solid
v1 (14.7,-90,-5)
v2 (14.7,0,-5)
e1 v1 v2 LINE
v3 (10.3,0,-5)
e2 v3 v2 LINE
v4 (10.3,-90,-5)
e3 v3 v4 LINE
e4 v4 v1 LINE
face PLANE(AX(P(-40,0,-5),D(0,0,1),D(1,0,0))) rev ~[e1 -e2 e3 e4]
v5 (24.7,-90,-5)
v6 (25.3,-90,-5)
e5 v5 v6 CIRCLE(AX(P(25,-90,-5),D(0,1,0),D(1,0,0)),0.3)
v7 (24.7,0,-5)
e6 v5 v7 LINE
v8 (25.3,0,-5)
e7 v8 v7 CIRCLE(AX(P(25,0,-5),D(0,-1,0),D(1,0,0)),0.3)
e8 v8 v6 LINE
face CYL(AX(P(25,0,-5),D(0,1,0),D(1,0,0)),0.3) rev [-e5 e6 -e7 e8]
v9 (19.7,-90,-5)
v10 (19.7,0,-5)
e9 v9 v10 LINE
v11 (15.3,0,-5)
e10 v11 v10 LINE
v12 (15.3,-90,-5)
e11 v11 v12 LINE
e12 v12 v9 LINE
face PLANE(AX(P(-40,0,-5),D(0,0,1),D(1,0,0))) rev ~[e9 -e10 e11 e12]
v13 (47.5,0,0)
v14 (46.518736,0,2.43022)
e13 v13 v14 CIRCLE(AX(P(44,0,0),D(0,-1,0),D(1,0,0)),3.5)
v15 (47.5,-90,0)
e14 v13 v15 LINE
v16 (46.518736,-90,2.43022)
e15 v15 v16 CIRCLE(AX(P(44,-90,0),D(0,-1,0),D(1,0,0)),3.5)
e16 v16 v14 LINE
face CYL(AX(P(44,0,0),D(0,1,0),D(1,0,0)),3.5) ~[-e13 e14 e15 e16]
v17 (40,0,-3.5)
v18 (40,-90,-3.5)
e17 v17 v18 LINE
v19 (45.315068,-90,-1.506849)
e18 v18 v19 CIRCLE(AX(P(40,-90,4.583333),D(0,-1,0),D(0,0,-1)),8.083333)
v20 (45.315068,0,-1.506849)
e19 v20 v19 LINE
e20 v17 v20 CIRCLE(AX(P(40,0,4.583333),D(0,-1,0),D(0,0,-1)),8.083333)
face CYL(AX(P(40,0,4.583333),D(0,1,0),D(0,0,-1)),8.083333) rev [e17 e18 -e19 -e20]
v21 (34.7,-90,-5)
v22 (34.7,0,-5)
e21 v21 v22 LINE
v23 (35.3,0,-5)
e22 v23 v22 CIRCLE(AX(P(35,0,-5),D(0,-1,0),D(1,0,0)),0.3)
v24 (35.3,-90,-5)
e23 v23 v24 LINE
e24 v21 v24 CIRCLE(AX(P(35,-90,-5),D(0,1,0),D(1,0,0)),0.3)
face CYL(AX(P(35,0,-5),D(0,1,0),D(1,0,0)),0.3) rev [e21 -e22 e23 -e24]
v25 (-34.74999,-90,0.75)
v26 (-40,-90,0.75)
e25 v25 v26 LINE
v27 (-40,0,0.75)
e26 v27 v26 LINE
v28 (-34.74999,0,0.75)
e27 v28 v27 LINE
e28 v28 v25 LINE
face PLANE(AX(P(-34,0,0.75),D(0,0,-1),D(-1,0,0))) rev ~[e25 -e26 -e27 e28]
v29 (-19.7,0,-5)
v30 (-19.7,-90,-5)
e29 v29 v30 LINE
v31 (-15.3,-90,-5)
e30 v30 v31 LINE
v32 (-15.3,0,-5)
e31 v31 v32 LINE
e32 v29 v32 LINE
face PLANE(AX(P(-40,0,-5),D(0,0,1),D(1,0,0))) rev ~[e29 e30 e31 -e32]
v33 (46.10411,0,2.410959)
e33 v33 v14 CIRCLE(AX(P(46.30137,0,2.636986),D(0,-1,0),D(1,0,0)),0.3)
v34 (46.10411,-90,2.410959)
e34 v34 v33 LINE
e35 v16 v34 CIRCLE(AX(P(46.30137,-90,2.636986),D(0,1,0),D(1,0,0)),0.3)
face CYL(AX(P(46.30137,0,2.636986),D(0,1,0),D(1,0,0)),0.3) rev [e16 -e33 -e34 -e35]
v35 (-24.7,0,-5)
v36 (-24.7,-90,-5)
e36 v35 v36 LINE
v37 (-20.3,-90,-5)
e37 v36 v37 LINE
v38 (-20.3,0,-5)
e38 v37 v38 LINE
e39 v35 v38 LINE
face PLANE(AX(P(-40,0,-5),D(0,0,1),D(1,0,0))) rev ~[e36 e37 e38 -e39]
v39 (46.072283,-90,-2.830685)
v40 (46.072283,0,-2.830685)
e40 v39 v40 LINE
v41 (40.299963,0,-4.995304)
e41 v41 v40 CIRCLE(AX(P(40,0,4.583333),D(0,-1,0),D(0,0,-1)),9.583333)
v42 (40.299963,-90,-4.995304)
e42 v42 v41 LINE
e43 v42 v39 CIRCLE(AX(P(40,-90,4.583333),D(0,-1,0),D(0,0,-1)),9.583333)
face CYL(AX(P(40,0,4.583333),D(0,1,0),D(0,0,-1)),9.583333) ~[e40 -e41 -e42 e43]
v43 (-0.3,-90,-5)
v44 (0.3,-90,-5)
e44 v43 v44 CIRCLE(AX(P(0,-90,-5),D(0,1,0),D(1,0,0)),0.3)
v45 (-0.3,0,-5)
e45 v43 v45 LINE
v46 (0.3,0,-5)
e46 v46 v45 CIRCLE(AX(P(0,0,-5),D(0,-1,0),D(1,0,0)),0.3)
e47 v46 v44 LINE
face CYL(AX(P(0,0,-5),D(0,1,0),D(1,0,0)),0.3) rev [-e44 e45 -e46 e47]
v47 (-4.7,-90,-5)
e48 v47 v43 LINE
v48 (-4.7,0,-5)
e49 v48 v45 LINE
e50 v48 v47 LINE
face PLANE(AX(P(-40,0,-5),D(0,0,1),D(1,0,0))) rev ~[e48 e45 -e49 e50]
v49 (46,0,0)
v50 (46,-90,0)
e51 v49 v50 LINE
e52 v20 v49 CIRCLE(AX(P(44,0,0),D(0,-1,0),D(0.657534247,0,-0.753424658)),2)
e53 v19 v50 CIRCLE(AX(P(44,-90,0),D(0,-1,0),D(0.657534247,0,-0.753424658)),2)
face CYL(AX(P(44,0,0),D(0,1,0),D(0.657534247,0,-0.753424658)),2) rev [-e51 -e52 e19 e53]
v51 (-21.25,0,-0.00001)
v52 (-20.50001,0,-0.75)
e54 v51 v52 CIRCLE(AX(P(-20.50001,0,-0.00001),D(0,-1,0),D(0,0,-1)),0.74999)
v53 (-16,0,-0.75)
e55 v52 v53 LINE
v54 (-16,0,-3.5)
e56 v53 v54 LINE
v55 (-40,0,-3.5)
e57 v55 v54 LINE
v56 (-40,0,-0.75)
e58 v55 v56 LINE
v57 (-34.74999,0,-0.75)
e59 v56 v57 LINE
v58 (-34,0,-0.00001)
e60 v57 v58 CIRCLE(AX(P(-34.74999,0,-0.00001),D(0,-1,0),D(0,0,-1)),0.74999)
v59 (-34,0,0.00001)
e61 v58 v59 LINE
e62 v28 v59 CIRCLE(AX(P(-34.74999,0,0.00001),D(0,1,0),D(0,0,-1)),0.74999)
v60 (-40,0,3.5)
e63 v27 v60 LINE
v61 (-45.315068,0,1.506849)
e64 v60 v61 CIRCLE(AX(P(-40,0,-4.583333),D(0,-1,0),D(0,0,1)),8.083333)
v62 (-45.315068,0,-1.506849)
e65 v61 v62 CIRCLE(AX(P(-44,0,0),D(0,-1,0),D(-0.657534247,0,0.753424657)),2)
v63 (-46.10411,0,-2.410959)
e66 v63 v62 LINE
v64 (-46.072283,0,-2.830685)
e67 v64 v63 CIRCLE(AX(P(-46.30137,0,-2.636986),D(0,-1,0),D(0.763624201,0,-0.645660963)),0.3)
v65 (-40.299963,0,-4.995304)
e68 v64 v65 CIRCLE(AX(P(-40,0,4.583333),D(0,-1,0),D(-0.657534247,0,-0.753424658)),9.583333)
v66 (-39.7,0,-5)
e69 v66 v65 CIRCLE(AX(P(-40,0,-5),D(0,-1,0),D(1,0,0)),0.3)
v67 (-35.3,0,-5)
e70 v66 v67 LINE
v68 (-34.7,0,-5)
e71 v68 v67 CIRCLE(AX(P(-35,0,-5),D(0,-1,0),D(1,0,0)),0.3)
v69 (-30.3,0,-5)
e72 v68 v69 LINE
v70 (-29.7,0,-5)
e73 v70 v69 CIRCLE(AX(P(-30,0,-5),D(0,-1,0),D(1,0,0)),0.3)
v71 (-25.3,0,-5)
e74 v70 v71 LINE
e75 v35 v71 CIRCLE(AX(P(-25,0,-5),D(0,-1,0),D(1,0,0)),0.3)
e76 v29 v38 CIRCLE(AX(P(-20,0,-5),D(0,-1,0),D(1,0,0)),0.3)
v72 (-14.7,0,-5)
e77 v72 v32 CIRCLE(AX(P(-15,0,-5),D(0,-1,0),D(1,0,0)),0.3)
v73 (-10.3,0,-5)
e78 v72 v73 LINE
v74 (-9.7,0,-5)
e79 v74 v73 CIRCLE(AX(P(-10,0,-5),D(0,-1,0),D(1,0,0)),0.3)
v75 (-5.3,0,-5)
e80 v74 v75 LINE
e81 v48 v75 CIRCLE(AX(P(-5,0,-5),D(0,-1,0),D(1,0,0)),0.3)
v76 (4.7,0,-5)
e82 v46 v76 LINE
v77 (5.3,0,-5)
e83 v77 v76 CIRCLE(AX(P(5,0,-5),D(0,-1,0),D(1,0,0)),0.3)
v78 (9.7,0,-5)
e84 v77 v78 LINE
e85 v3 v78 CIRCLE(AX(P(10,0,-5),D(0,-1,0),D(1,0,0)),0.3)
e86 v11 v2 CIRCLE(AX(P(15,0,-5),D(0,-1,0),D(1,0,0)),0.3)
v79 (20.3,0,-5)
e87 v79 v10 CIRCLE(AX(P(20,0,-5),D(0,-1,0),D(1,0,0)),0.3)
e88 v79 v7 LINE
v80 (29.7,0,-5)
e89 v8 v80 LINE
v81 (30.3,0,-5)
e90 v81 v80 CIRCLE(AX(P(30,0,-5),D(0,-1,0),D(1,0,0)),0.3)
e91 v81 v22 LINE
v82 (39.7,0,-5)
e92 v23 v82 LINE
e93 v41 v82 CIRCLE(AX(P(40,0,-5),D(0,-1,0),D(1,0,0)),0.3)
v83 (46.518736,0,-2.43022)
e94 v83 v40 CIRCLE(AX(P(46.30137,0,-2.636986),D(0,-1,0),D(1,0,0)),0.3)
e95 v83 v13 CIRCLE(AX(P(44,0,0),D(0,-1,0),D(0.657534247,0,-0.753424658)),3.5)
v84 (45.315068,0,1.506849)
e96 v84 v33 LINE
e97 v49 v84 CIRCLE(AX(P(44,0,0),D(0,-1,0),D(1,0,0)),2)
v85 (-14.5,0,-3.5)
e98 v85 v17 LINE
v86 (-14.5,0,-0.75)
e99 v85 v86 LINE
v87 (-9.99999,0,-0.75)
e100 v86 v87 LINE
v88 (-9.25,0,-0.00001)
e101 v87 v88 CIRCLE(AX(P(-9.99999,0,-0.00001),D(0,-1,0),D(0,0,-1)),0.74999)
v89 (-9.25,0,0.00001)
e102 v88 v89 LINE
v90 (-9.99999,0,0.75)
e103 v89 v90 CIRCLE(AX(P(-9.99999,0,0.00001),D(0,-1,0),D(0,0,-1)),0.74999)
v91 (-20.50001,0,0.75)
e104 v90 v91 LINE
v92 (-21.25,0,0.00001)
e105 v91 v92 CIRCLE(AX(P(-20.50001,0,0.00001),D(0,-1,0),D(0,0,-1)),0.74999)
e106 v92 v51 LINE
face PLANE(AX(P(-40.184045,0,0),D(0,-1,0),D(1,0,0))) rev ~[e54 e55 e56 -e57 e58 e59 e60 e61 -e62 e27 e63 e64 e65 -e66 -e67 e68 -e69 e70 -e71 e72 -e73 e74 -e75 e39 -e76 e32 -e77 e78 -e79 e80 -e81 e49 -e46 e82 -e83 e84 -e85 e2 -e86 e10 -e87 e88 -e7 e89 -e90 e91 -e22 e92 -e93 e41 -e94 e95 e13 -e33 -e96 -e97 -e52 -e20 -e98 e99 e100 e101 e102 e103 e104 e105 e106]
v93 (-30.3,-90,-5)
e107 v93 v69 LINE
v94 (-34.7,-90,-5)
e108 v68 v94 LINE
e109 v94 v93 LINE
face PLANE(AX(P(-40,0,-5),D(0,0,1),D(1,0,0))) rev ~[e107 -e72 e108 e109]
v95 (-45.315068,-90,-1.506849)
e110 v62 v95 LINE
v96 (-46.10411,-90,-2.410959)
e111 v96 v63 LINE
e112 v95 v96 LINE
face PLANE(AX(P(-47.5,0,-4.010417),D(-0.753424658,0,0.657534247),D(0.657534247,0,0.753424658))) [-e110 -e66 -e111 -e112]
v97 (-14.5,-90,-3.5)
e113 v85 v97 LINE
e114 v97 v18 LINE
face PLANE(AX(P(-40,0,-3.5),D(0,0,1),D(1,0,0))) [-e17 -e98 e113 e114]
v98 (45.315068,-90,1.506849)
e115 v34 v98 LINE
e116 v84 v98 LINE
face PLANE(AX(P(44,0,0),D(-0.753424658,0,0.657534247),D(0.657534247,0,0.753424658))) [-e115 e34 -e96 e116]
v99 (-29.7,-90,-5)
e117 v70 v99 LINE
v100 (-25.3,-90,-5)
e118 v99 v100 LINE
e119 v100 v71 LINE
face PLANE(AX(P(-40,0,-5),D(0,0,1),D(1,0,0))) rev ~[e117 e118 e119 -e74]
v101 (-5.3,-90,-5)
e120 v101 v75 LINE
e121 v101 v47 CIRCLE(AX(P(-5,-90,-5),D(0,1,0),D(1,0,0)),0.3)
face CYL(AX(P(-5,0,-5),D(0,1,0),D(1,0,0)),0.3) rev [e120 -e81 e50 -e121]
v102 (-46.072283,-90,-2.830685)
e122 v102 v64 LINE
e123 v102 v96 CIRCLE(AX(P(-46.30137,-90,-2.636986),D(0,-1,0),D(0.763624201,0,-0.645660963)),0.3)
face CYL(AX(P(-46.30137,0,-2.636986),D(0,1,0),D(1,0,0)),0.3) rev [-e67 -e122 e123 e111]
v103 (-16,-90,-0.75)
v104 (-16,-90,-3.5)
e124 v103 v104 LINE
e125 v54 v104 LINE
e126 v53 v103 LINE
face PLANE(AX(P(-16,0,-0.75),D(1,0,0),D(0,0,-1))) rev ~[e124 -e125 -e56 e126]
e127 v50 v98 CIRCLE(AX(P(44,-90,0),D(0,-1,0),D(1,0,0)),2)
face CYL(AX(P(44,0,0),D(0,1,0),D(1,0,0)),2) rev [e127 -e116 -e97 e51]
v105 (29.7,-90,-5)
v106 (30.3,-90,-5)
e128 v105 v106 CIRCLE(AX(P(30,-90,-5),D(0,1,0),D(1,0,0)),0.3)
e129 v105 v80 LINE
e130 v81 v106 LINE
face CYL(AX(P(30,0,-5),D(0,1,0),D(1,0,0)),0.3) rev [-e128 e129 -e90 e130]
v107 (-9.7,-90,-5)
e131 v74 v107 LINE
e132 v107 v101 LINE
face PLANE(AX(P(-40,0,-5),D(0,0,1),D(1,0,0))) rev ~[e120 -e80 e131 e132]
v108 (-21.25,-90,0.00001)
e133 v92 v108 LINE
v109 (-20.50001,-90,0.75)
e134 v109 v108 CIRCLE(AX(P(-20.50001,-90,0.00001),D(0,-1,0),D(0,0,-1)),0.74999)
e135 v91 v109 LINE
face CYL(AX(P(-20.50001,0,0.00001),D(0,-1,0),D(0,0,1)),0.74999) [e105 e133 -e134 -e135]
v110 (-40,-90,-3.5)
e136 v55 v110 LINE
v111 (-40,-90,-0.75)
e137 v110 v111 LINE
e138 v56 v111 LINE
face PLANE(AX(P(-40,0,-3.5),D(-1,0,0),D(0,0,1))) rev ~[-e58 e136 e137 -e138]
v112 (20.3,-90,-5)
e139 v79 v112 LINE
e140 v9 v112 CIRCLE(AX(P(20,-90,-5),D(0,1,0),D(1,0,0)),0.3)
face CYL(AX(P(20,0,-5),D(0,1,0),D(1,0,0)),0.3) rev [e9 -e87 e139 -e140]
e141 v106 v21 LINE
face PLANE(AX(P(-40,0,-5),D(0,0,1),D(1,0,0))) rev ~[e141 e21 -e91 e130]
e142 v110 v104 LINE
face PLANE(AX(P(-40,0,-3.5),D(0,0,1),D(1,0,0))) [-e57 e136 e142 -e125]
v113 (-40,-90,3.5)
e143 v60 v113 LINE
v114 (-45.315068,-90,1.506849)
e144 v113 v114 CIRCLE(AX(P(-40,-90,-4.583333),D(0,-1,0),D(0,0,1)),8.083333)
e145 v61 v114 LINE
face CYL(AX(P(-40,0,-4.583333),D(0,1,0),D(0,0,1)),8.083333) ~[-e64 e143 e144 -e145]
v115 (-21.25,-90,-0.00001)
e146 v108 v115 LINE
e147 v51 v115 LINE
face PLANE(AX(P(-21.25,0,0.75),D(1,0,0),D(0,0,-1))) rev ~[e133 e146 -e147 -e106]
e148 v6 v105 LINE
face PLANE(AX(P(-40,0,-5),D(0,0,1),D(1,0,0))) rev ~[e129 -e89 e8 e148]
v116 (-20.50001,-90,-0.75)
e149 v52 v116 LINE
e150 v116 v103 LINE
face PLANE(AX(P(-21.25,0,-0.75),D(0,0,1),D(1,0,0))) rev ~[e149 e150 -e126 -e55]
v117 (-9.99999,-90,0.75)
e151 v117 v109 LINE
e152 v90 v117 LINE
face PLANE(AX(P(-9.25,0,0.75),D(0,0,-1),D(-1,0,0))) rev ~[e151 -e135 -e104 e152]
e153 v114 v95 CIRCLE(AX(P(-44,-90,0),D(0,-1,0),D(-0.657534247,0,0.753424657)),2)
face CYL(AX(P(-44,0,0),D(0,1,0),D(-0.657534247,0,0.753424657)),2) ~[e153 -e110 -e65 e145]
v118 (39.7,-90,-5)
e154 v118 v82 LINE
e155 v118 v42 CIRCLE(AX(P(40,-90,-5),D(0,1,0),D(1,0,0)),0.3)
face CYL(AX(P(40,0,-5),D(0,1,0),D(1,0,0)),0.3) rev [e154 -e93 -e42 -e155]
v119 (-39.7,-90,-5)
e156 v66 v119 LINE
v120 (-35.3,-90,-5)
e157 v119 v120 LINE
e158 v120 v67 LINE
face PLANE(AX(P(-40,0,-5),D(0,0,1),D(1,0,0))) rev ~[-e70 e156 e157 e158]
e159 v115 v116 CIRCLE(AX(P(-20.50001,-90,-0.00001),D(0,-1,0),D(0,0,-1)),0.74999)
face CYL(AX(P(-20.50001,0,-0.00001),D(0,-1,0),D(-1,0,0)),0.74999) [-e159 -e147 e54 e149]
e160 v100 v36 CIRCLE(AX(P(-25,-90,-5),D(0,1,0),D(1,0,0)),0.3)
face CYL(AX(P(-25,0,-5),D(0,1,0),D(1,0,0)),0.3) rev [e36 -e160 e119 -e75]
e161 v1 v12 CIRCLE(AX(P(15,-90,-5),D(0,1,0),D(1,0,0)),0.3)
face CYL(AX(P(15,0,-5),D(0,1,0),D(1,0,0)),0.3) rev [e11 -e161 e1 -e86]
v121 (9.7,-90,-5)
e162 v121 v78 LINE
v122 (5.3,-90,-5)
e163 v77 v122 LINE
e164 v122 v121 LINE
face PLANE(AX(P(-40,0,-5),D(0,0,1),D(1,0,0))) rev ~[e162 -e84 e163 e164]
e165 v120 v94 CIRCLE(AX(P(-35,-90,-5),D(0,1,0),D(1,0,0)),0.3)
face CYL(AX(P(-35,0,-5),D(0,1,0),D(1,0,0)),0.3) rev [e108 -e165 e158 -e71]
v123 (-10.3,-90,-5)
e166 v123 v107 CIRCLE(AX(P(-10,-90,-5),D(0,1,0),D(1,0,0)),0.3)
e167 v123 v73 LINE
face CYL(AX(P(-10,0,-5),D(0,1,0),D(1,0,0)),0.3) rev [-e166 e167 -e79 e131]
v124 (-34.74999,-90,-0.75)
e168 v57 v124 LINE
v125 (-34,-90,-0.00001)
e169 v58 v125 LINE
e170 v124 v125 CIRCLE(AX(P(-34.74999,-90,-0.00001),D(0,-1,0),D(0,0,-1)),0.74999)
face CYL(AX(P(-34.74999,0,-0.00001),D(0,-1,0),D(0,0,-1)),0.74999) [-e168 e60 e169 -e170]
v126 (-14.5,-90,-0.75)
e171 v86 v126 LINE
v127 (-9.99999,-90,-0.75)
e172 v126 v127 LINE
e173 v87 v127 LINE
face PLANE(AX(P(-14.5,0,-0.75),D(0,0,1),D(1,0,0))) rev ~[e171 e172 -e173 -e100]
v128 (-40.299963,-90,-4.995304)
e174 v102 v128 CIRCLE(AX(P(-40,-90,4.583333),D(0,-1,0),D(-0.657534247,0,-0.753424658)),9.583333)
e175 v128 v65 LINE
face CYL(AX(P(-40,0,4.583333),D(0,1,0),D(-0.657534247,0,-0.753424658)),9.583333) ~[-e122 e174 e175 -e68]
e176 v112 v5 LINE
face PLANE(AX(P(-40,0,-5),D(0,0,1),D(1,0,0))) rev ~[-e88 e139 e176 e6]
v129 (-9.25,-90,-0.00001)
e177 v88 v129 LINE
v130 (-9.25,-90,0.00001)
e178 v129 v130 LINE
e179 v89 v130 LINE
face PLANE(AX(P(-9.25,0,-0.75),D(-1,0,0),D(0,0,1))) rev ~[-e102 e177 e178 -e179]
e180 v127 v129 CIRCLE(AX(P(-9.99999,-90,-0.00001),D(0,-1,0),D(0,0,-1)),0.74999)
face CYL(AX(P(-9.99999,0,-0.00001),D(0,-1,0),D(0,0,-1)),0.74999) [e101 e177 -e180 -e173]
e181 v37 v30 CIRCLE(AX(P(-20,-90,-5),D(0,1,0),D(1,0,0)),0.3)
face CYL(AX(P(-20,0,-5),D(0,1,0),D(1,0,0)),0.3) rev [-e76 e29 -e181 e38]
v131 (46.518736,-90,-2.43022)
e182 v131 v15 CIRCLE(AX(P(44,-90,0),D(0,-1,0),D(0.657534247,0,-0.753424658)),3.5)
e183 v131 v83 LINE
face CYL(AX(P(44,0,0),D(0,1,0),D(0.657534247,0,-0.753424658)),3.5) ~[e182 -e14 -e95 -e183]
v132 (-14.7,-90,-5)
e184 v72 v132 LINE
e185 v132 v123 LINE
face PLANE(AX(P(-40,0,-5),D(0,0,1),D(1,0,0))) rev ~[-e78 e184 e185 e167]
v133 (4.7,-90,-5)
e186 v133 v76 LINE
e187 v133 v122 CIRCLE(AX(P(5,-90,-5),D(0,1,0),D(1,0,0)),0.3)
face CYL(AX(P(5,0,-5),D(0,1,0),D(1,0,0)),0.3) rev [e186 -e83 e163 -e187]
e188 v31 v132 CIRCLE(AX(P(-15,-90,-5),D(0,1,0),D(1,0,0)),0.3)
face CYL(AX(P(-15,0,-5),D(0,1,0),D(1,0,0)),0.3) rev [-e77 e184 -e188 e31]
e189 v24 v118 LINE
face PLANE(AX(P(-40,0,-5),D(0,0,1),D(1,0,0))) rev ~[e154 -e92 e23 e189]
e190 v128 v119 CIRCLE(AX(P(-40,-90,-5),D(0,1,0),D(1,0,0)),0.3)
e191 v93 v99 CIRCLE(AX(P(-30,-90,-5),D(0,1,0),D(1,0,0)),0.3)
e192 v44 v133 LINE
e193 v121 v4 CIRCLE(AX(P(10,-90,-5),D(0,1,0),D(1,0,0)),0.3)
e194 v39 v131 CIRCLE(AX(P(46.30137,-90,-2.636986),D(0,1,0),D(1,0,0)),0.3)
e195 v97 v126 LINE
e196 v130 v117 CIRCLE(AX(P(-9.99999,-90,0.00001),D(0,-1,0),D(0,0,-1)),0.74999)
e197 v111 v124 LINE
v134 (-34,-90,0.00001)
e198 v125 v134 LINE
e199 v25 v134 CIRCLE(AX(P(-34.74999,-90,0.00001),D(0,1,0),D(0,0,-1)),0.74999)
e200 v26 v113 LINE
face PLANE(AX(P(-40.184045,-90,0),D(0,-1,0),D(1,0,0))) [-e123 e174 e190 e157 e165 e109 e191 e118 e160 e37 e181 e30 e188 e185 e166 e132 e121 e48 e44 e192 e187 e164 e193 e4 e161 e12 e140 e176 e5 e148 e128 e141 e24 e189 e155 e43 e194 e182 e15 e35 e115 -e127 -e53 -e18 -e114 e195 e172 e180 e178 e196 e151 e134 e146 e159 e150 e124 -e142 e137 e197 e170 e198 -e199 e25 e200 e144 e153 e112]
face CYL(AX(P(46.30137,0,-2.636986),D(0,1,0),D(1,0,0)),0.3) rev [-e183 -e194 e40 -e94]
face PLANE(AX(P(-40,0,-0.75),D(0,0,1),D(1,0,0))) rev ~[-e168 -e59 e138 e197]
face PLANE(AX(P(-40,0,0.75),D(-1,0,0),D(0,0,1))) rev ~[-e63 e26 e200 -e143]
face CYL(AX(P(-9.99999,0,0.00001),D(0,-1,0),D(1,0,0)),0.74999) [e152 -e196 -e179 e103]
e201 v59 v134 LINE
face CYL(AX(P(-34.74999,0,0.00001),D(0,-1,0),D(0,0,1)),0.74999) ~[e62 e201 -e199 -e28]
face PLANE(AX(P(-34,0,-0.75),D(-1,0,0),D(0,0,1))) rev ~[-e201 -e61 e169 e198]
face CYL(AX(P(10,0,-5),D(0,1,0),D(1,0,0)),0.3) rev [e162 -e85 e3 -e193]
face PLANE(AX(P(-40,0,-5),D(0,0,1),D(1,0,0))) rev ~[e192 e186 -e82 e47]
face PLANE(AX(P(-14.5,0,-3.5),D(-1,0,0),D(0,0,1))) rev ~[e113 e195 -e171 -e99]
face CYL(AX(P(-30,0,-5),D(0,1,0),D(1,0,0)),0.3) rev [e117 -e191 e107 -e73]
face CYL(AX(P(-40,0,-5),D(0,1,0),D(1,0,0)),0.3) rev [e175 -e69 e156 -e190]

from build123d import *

# Parameters (mm, degrees)
F1_DEPTH  = 90
F2_T      = -1.5
F4_DEPTH  = 90.001
F6_DEPTH  = 90
F8_DEPTH  = 90
F9_R      = 0.74999
F10_R     = 0.3
F11_DEPTH = 90.001


# Not quite as in the source:
# - a fillet or chamfer is up to 0.001 mm smaller than in the source, because OpenCascade refuses the exact size


with BuildPart() as f1:
    # F0 (on Front) → F1 (new body)
    with BuildSketch(Plane.XZ):
        with BuildLine():
            Line((40, 5), (0, 5))
            Line((0, 5), (-40, 5))
            ThreePointArc((-40, 5), (-43.3649329819, 4.389821285), (-46.301369863, 2.6369863014))
            ThreePointArc((-46.301369863, 2.6369863014), (-47.1862826711, 1.4483103051), (-47.5, 0))
            ThreePointArc((-47.5, 0), (-47.1862826711, -1.4483103051), (-46.301369863, -2.6369863014))
            ThreePointArc((-46.301369863, -2.6369863014), (-43.3649329819, -4.389821285), (-40, -5))
            Line((-40, -5), (0, -5))
            Line((0, -5), (40, -5))
            ThreePointArc((40, -5), (43.3649329819, -4.389821285), (46.301369863, -2.6369863014))
            ThreePointArc((46.301369863, -2.6369863014), (47.1862826711, -1.4483103051), (47.5, 0))
            ThreePointArc((47.5, 0), (47.1862826711, 1.4483103051), (46.301369863, 2.6369863014))
            ThreePointArc((46.301369863, 2.6369863014), (43.3649329819, 4.389821285), (40, 5))
        make_face()
    extrude(amount=F1_DEPTH)

    # F2
    f2_openings = [f1.faces().sort_by_distance(p)[0] for p in [
        (0, -90, 0),
        (0, 0, 0),
    ]]
    offset(amount=F2_T, openings=f2_openings)

    # F3 (on Front) → F4 (cut, through all)
    with BuildSketch(Plane.XZ):
        Polygon((-44, 0), (44, 0), (52.7272727273, 10), (-47.5, 10), (-47.5, -4.0104166667), align=None)
    extrude(amount=F4_DEPTH, mode=Mode.SUBTRACT)

    # F5 (on Front) → F6 (join, through all)
    with BuildSketch(Plane.XZ):
        with BuildLine():
            ThreePointArc((-40, 3.5), (-42.8382478195, 2.9853275187), (-45.3150684932, 1.5068493151))
            ThreePointArc((-45.3150684932, 1.5068493151), (-46, 0), (-45.3150684932, -1.5068493151))
            ThreePointArc((-45.3150684932, -1.5068493151), (-42.8382478195, -2.9853275187), (-40, -3.5))
            Line((-40, -3.5), (-40, -0.75))
            Line((-40, -0.75), (-34, -0.75))
            Line((-34, -0.75), (-34, 0.75))
            Line((-34, 0.75), (-40, 0.75))
            Line((-40, 0.75), (-40, 3.5))
        make_face()
    extrude(amount=F6_DEPTH)

    # F7 (on Front) → F8 (join, through all)
    with BuildSketch(Plane.XZ):
        Polygon((-16, -0.75), (-16, -3.5), (-14.5, -3.5), (-14.5, -0.75), (-9.25, -0.75), (-9.25, 0.75), (-21.25, 0.75), (-21.25, -0.75), align=None)
    extrude(amount=F8_DEPTH)

    # F9 (radius 0.75 in the source; OpenCascade refuses exactly that, so slightly less here)
    f9_edges = [f1.edges().sort_by_distance(p)[0] for p in [
        (-34, -45, 0.75),
        (-34, -45, -0.75),
        (-9.25, -45, 0.75),
        (-9.25, -45, -0.75),
        (-21.25, -45, 0.75),
        (-21.25, -45, -0.75),
    ]]
    fillet(f9_edges, radius=F9_R)

    # F10 (on Front) → F11 (cut, through all)
    with BuildSketch(Plane.XZ):
        with Locations((40, -5)):
            Circle(F10_R)
        with Locations((35, -5)):
            Circle(F10_R)
        with Locations((30, -5)):
            Circle(F10_R)
        with Locations((25, -5)):
            Circle(F10_R)
        with Locations((20, -5)):
            Circle(F10_R)
        with Locations((15, -5)):
            Circle(F10_R)
        with Locations((10, -5)):
            Circle(F10_R)
        with Locations((5, -5)):
            Circle(F10_R)
        with Locations((0, -5)):
            Circle(F10_R)
        with Locations((46.301369863, -2.6369863014)):
            Circle(F10_R)
        with Locations((-5, -5)):
            Circle(F10_R)
        with Locations((-10, -5)):
            Circle(F10_R)
        with Locations((-15, -5)):
            Circle(F10_R)
        with Locations((-20, -5)):
            Circle(F10_R)
        with Locations((-25, -5)):
            Circle(F10_R)
        with Locations((-30, -5)):
            Circle(F10_R)
        with Locations((-35, -5)):
            Circle(F10_R)
        with Locations((-40, -5)):
            Circle(F10_R)
        with Locations((46.301369863, 2.6369863014)):
            Circle(F10_R)
        with Locations((-46.301369863, -2.6369863014)):
            Circle(F10_R)
    extrude(amount=F11_DEPTH, mode=Mode.SUBTRACT)


solid = f1.part
